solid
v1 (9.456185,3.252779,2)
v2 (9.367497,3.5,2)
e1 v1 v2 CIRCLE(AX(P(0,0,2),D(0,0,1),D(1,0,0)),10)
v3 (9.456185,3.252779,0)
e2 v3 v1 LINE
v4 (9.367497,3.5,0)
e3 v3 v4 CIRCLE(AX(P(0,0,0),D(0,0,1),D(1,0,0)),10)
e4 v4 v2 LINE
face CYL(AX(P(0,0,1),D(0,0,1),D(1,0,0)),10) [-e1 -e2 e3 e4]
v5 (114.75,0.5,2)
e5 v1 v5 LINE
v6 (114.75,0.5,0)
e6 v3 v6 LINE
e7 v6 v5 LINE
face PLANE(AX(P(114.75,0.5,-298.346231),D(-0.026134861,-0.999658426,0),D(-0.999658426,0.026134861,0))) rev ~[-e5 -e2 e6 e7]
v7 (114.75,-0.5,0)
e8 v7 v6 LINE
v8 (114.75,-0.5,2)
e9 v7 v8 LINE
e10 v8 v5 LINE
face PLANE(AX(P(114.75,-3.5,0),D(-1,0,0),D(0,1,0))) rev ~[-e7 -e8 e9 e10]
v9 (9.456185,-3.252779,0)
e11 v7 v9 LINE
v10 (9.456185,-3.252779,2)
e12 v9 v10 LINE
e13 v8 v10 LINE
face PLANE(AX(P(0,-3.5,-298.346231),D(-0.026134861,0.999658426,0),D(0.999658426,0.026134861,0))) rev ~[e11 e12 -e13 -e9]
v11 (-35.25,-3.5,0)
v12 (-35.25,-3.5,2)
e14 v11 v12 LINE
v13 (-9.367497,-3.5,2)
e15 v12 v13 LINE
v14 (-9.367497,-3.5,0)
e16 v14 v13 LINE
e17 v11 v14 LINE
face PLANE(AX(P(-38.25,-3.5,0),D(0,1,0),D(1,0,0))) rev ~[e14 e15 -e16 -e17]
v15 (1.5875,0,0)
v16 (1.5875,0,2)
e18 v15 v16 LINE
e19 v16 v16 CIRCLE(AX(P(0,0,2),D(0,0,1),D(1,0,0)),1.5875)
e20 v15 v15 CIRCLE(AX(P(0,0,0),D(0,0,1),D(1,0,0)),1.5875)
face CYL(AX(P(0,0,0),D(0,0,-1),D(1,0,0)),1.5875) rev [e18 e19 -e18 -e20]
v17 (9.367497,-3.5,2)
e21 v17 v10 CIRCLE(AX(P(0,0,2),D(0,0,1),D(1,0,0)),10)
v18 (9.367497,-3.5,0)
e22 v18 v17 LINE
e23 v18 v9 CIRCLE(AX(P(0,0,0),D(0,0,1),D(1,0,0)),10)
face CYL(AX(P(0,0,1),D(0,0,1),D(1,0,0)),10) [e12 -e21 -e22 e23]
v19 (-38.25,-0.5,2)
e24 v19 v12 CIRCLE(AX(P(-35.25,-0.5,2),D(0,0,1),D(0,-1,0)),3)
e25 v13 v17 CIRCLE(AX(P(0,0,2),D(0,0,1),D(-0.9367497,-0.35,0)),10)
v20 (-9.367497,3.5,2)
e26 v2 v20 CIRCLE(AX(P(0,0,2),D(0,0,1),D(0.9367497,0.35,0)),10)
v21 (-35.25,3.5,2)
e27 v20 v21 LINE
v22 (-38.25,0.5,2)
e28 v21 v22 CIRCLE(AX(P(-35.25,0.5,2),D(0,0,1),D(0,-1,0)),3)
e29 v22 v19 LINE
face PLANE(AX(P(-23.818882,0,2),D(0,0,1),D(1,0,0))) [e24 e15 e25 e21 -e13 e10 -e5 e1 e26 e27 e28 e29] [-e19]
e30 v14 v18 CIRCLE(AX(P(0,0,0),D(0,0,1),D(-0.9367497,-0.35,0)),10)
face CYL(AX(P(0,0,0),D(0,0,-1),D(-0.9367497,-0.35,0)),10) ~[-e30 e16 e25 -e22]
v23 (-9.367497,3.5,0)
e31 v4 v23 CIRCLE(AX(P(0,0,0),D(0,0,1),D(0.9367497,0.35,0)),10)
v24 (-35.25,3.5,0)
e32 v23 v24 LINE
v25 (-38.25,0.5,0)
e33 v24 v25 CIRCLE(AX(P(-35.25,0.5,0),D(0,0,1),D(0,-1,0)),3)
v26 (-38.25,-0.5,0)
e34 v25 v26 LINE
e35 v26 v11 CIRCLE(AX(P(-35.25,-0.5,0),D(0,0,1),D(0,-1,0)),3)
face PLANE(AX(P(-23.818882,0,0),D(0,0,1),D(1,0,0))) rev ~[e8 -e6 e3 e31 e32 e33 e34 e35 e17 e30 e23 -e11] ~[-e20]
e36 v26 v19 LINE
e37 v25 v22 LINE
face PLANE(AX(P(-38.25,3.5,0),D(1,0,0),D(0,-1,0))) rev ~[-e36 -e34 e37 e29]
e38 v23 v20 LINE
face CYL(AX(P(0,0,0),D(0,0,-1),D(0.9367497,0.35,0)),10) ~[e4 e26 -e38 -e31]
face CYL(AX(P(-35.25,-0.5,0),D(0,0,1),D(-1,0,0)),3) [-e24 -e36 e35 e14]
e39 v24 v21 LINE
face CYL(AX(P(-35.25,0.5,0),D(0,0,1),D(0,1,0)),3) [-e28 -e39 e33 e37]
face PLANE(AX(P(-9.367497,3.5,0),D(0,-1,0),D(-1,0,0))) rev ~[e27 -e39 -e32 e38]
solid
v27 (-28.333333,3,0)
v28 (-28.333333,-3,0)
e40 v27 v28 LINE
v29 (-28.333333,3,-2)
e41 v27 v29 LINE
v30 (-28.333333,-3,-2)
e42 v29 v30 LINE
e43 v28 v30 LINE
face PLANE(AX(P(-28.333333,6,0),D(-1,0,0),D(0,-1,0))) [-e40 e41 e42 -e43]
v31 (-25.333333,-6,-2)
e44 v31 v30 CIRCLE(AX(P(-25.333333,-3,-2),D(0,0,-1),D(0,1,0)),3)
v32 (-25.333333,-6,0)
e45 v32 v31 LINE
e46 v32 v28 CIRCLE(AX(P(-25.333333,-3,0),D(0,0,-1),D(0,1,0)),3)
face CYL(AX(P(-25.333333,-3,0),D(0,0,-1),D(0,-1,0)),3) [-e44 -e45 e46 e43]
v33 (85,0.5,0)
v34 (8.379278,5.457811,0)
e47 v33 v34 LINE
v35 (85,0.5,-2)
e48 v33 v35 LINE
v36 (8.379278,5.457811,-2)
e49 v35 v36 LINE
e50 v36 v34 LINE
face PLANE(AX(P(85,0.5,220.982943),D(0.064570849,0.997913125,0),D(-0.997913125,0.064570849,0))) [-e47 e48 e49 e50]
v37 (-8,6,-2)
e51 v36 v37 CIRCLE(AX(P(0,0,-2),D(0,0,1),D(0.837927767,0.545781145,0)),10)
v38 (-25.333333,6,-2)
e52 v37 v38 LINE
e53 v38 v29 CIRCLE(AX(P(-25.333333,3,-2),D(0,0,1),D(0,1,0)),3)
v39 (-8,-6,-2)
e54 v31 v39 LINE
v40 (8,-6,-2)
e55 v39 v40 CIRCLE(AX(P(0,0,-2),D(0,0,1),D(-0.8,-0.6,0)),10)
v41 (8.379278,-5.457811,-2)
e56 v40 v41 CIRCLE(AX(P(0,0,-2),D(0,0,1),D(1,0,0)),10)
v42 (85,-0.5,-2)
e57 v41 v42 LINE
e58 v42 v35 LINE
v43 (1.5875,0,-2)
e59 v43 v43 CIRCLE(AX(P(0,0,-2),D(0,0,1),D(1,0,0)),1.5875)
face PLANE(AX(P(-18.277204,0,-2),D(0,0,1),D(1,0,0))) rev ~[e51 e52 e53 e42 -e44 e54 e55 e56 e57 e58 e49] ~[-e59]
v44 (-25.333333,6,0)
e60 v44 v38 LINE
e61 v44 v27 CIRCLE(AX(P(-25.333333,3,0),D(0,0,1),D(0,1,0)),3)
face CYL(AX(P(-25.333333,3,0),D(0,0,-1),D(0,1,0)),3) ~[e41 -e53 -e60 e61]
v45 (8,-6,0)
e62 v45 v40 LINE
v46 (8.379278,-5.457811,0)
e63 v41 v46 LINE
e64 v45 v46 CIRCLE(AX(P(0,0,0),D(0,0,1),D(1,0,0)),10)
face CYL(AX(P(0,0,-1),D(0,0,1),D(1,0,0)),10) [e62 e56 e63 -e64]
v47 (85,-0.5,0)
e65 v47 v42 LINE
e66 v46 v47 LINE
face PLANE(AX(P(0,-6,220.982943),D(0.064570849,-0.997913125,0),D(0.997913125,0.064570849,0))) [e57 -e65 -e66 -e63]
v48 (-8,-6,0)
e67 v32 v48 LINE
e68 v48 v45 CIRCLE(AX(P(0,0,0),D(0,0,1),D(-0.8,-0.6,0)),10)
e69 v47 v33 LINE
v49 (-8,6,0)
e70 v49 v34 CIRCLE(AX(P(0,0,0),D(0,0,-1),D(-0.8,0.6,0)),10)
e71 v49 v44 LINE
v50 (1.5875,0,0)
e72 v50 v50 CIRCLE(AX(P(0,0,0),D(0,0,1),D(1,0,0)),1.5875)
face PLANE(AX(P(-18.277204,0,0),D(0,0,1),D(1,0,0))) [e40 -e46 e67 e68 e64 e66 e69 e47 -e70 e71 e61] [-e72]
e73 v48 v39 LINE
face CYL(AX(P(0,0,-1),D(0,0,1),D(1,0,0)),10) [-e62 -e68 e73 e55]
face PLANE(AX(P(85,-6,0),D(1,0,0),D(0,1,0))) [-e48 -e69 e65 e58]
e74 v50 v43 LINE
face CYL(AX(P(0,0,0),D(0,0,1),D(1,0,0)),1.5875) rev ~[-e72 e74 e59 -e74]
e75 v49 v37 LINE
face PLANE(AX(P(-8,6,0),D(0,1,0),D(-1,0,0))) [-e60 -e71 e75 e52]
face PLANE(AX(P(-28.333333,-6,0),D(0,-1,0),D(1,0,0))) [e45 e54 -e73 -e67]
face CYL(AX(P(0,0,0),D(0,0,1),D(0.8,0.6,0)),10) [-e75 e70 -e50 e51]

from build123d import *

# Parameters (mm, degrees)
F4_R         = 1.5875
F5_DEPTH     = 2
F6_R         = 1.5875
F7_DEPTH     = 2
F8_T4_DEPTH  = 443.9658863068
F8_S5_R      = 10
F8_T6_DEPTH  = 228
F8_T10_DEPTH = 443.9658863068
F8_S11_R     = 10
F8_T12_DEPTH = 228
F9_T4_DEPTH  = 598.692462338
F9_S5_R      = 10
F9_T6_DEPTH  = 306
F9_T10_DEPTH = 598.692462338
F9_S11_R     = 10
F9_T12_DEPTH = 306
F10_R        = 3
F10_2_R      = 3


# Not quite as in the source:
# - a fillet or chamfer that OpenCascade refuses, or shapes differently, is made with other operations: its cross-section is extruded or revolved along the edge and cut away or added


with BuildPart() as f5:
    # F4 (on Top) → F5 (new body)
    with BuildSketch(Plane.XY):
        with BuildLine():
            Line((-9.3674969976, 3.5), (-38.25, 3.5))
            Line((-38.25, 3.5), (-38.25, -3.5))
            Line((-38.25, -3.5), (-9.3674969976, -3.5))
            ThreePointArc((-9.3674969976, -3.5), (-10, 0), (-9.3674969976, 3.5))
        make_face()
        with BuildLine():
            ThreePointArc((9.3674969976, 3.5), (0, 10), (-9.3674969976, 3.5))
            Line((-9.3674969976, 3.5), (9.3674969976, 3.5))
        make_face()
        with BuildLine():
            Line((9.3674969976, 3.5), (-9.3674969976, 3.5))
            ThreePointArc((-9.3674969976, 3.5), (-10, 0), (-9.3674969976, -3.5))
            Line((-9.3674969976, -3.5), (9.3674969976, -3.5))
            ThreePointArc((9.3674969976, -3.5), (9.8406038935, -1.7783461452), (10, 0))
            ThreePointArc((10, 0), (9.8406038935, 1.7783461452), (9.3674969976, 3.5))
        make_face()
        Circle(F4_R, mode=Mode.SUBTRACT)
        with BuildLine():
            Line((114.75, 3.5), (9.3674969976, 3.5))
            ThreePointArc((9.3674969976, 3.5), (9.8406038935, 1.7783461452), (10, 0))
            ThreePointArc((10, 0), (9.8406038935, -1.7783461452), (9.3674969976, -3.5))
            Line((9.3674969976, -3.5), (114.75, -3.5))
            Line((114.75, -3.5), (114.75, 3.5))
        make_face()
        with BuildLine():
            Line((9.3674969976, -3.5), (-9.3674969976, -3.5))
            ThreePointArc((-9.3674969976, -3.5), (0, -10), (9.3674969976, -3.5))
        make_face()
    extrude(amount=F5_DEPTH)

    # F9: chamfer of 114.75 x 3 on 2 edges, made by hand


with BuildPart() as f7:
    # F6 (on Top) → F7 (new body)
    with BuildSketch(Plane.XY):
        with BuildLine():
            Line((-8, 6), (-28.3333333333, 6))
            Line((-28.3333333333, 6), (-28.3333333333, -6))
            Line((-28.3333333333, -6), (-8, -6))
            ThreePointArc((-8, -6), (-10, 0), (-8, 6))
        make_face()
        with BuildLine():
            ThreePointArc((8, 6), (0, 10), (-8, 6))
            Line((-8, 6), (8, 6))
        make_face()
        with BuildLine():
            Line((8, 6), (-8, 6))
            ThreePointArc((-8, 6), (-10, 0), (-8, -6))
            Line((-8, -6), (8, -6))
            ThreePointArc((8, -6), (9.4868329805, -3.1622776602), (10, 0))
            ThreePointArc((10, 0), (9.4868329805, 3.1622776602), (8, 6))
        make_face()
        Circle(F6_R, mode=Mode.SUBTRACT)
        with BuildLine():
            Line((85, 6), (8, 6))
            ThreePointArc((8, 6), (9.4868329805, 3.1622776602), (10, 0))
            ThreePointArc((10, 0), (9.4868329805, -3.1622776602), (8, -6))
            Line((8, -6), (85, -6))
            Line((85, -6), (85, 6))
        make_face()
        with BuildLine():
            Line((8, -6), (-8, -6))
            ThreePointArc((-8, -6), (0, -10), (8, -6))
        make_face()
    extrude(amount=-F7_DEPTH)

    # F8: chamfer of 85 x 5.5 on 2 edges, made by hand


with BuildPart() as f8_tool2:
    # F8_s3 → F8_t4 (new body)
    with BuildSketch(Plane.XY.offset(220.9829431534)):
        Polygon((0, -6), (85, -0.5), (85, -6), align=None)
    extrude(amount=-F8_T4_DEPTH)

    # F8_s5 → F8_t6 (cut, symmetric)
    with BuildSketch(Plane.XY.offset(-1)):
        Circle(F8_S5_R)
    extrude(amount=F8_T6_DEPTH, both=True, mode=Mode.SUBTRACT)


with BuildPart() as f7_1:
    add(f7.part)

    # F8_t1: cut F8_tool2
    add(f8_tool2.part, mode=Mode.SUBTRACT)


with BuildPart() as f8_tool8:
    # F8_s9 → F8_t10 (new body)
    with BuildSketch(Plane.XY.offset(220.9829431534)):
        Polygon((85, 0.5), (0, 6), (85, 6), align=None)
    extrude(amount=-F8_T10_DEPTH)

    # F8_s11 → F8_t12 (cut, symmetric)
    with BuildSketch(Plane.XY.offset(-1)):
        Circle(F8_S11_R)
    extrude(amount=F8_T12_DEPTH, both=True, mode=Mode.SUBTRACT)


with BuildPart() as f7_2:
    add(f7_1.part)

    # F8_t7: cut F8_tool8
    add(f8_tool8.part, mode=Mode.SUBTRACT)

    # F10#2
    f10_2_edges = [f7_2.edges().sort_by_distance(p)[0] for p in [
        (-28.333333, 6, -1),
        (-28.333333, -6, -1),
    ]]
    fillet(f10_2_edges, radius=F10_2_R)


with BuildPart() as f9_tool2:
    # F9_s3 → F9_t4 (new body)
    with BuildSketch(Plane.XY.offset(-298.346231169)):
        Polygon((0, -3.5), (114.75, -0.5), (114.75, -3.5), align=None)
    extrude(amount=F9_T4_DEPTH)

    # F9_s5 → F9_t6 (cut, symmetric)
    with BuildSketch(Plane.XY.offset(1)):
        Circle(F9_S5_R)
    extrude(amount=F9_T6_DEPTH, both=True, mode=Mode.SUBTRACT)


with BuildPart() as f5_1:
    add(f5.part)

    # F9_t1: cut F9_tool2
    add(f9_tool2.part, mode=Mode.SUBTRACT)


with BuildPart() as f9_tool8:
    # F9_s9 → F9_t10 (new body)
    with BuildSketch(Plane.XY.offset(-298.346231169)):
        Polygon((114.75, 0.5), (0, 3.5), (114.75, 3.5), align=None)
    extrude(amount=F9_T10_DEPTH)

    # F9_s11 → F9_t12 (cut, symmetric)
    with BuildSketch(Plane.XY.offset(1)):
        Circle(F9_S11_R)
    extrude(amount=F9_T12_DEPTH, both=True, mode=Mode.SUBTRACT)


with BuildPart() as f5_2:
    add(f5_1.part)

    # F9_t7: cut F9_tool8
    add(f9_tool8.part, mode=Mode.SUBTRACT)

    # F10
    f10_edges = [f5_2.edges().sort_by_distance(p)[0] for p in [
        (-38.25, 3.5, 1),
        (-38.25, -3.5, 1),
    ]]
    fillet(f10_edges, radius=F10_R)


solid = Compound([f7_2.part, f5_2.part])
